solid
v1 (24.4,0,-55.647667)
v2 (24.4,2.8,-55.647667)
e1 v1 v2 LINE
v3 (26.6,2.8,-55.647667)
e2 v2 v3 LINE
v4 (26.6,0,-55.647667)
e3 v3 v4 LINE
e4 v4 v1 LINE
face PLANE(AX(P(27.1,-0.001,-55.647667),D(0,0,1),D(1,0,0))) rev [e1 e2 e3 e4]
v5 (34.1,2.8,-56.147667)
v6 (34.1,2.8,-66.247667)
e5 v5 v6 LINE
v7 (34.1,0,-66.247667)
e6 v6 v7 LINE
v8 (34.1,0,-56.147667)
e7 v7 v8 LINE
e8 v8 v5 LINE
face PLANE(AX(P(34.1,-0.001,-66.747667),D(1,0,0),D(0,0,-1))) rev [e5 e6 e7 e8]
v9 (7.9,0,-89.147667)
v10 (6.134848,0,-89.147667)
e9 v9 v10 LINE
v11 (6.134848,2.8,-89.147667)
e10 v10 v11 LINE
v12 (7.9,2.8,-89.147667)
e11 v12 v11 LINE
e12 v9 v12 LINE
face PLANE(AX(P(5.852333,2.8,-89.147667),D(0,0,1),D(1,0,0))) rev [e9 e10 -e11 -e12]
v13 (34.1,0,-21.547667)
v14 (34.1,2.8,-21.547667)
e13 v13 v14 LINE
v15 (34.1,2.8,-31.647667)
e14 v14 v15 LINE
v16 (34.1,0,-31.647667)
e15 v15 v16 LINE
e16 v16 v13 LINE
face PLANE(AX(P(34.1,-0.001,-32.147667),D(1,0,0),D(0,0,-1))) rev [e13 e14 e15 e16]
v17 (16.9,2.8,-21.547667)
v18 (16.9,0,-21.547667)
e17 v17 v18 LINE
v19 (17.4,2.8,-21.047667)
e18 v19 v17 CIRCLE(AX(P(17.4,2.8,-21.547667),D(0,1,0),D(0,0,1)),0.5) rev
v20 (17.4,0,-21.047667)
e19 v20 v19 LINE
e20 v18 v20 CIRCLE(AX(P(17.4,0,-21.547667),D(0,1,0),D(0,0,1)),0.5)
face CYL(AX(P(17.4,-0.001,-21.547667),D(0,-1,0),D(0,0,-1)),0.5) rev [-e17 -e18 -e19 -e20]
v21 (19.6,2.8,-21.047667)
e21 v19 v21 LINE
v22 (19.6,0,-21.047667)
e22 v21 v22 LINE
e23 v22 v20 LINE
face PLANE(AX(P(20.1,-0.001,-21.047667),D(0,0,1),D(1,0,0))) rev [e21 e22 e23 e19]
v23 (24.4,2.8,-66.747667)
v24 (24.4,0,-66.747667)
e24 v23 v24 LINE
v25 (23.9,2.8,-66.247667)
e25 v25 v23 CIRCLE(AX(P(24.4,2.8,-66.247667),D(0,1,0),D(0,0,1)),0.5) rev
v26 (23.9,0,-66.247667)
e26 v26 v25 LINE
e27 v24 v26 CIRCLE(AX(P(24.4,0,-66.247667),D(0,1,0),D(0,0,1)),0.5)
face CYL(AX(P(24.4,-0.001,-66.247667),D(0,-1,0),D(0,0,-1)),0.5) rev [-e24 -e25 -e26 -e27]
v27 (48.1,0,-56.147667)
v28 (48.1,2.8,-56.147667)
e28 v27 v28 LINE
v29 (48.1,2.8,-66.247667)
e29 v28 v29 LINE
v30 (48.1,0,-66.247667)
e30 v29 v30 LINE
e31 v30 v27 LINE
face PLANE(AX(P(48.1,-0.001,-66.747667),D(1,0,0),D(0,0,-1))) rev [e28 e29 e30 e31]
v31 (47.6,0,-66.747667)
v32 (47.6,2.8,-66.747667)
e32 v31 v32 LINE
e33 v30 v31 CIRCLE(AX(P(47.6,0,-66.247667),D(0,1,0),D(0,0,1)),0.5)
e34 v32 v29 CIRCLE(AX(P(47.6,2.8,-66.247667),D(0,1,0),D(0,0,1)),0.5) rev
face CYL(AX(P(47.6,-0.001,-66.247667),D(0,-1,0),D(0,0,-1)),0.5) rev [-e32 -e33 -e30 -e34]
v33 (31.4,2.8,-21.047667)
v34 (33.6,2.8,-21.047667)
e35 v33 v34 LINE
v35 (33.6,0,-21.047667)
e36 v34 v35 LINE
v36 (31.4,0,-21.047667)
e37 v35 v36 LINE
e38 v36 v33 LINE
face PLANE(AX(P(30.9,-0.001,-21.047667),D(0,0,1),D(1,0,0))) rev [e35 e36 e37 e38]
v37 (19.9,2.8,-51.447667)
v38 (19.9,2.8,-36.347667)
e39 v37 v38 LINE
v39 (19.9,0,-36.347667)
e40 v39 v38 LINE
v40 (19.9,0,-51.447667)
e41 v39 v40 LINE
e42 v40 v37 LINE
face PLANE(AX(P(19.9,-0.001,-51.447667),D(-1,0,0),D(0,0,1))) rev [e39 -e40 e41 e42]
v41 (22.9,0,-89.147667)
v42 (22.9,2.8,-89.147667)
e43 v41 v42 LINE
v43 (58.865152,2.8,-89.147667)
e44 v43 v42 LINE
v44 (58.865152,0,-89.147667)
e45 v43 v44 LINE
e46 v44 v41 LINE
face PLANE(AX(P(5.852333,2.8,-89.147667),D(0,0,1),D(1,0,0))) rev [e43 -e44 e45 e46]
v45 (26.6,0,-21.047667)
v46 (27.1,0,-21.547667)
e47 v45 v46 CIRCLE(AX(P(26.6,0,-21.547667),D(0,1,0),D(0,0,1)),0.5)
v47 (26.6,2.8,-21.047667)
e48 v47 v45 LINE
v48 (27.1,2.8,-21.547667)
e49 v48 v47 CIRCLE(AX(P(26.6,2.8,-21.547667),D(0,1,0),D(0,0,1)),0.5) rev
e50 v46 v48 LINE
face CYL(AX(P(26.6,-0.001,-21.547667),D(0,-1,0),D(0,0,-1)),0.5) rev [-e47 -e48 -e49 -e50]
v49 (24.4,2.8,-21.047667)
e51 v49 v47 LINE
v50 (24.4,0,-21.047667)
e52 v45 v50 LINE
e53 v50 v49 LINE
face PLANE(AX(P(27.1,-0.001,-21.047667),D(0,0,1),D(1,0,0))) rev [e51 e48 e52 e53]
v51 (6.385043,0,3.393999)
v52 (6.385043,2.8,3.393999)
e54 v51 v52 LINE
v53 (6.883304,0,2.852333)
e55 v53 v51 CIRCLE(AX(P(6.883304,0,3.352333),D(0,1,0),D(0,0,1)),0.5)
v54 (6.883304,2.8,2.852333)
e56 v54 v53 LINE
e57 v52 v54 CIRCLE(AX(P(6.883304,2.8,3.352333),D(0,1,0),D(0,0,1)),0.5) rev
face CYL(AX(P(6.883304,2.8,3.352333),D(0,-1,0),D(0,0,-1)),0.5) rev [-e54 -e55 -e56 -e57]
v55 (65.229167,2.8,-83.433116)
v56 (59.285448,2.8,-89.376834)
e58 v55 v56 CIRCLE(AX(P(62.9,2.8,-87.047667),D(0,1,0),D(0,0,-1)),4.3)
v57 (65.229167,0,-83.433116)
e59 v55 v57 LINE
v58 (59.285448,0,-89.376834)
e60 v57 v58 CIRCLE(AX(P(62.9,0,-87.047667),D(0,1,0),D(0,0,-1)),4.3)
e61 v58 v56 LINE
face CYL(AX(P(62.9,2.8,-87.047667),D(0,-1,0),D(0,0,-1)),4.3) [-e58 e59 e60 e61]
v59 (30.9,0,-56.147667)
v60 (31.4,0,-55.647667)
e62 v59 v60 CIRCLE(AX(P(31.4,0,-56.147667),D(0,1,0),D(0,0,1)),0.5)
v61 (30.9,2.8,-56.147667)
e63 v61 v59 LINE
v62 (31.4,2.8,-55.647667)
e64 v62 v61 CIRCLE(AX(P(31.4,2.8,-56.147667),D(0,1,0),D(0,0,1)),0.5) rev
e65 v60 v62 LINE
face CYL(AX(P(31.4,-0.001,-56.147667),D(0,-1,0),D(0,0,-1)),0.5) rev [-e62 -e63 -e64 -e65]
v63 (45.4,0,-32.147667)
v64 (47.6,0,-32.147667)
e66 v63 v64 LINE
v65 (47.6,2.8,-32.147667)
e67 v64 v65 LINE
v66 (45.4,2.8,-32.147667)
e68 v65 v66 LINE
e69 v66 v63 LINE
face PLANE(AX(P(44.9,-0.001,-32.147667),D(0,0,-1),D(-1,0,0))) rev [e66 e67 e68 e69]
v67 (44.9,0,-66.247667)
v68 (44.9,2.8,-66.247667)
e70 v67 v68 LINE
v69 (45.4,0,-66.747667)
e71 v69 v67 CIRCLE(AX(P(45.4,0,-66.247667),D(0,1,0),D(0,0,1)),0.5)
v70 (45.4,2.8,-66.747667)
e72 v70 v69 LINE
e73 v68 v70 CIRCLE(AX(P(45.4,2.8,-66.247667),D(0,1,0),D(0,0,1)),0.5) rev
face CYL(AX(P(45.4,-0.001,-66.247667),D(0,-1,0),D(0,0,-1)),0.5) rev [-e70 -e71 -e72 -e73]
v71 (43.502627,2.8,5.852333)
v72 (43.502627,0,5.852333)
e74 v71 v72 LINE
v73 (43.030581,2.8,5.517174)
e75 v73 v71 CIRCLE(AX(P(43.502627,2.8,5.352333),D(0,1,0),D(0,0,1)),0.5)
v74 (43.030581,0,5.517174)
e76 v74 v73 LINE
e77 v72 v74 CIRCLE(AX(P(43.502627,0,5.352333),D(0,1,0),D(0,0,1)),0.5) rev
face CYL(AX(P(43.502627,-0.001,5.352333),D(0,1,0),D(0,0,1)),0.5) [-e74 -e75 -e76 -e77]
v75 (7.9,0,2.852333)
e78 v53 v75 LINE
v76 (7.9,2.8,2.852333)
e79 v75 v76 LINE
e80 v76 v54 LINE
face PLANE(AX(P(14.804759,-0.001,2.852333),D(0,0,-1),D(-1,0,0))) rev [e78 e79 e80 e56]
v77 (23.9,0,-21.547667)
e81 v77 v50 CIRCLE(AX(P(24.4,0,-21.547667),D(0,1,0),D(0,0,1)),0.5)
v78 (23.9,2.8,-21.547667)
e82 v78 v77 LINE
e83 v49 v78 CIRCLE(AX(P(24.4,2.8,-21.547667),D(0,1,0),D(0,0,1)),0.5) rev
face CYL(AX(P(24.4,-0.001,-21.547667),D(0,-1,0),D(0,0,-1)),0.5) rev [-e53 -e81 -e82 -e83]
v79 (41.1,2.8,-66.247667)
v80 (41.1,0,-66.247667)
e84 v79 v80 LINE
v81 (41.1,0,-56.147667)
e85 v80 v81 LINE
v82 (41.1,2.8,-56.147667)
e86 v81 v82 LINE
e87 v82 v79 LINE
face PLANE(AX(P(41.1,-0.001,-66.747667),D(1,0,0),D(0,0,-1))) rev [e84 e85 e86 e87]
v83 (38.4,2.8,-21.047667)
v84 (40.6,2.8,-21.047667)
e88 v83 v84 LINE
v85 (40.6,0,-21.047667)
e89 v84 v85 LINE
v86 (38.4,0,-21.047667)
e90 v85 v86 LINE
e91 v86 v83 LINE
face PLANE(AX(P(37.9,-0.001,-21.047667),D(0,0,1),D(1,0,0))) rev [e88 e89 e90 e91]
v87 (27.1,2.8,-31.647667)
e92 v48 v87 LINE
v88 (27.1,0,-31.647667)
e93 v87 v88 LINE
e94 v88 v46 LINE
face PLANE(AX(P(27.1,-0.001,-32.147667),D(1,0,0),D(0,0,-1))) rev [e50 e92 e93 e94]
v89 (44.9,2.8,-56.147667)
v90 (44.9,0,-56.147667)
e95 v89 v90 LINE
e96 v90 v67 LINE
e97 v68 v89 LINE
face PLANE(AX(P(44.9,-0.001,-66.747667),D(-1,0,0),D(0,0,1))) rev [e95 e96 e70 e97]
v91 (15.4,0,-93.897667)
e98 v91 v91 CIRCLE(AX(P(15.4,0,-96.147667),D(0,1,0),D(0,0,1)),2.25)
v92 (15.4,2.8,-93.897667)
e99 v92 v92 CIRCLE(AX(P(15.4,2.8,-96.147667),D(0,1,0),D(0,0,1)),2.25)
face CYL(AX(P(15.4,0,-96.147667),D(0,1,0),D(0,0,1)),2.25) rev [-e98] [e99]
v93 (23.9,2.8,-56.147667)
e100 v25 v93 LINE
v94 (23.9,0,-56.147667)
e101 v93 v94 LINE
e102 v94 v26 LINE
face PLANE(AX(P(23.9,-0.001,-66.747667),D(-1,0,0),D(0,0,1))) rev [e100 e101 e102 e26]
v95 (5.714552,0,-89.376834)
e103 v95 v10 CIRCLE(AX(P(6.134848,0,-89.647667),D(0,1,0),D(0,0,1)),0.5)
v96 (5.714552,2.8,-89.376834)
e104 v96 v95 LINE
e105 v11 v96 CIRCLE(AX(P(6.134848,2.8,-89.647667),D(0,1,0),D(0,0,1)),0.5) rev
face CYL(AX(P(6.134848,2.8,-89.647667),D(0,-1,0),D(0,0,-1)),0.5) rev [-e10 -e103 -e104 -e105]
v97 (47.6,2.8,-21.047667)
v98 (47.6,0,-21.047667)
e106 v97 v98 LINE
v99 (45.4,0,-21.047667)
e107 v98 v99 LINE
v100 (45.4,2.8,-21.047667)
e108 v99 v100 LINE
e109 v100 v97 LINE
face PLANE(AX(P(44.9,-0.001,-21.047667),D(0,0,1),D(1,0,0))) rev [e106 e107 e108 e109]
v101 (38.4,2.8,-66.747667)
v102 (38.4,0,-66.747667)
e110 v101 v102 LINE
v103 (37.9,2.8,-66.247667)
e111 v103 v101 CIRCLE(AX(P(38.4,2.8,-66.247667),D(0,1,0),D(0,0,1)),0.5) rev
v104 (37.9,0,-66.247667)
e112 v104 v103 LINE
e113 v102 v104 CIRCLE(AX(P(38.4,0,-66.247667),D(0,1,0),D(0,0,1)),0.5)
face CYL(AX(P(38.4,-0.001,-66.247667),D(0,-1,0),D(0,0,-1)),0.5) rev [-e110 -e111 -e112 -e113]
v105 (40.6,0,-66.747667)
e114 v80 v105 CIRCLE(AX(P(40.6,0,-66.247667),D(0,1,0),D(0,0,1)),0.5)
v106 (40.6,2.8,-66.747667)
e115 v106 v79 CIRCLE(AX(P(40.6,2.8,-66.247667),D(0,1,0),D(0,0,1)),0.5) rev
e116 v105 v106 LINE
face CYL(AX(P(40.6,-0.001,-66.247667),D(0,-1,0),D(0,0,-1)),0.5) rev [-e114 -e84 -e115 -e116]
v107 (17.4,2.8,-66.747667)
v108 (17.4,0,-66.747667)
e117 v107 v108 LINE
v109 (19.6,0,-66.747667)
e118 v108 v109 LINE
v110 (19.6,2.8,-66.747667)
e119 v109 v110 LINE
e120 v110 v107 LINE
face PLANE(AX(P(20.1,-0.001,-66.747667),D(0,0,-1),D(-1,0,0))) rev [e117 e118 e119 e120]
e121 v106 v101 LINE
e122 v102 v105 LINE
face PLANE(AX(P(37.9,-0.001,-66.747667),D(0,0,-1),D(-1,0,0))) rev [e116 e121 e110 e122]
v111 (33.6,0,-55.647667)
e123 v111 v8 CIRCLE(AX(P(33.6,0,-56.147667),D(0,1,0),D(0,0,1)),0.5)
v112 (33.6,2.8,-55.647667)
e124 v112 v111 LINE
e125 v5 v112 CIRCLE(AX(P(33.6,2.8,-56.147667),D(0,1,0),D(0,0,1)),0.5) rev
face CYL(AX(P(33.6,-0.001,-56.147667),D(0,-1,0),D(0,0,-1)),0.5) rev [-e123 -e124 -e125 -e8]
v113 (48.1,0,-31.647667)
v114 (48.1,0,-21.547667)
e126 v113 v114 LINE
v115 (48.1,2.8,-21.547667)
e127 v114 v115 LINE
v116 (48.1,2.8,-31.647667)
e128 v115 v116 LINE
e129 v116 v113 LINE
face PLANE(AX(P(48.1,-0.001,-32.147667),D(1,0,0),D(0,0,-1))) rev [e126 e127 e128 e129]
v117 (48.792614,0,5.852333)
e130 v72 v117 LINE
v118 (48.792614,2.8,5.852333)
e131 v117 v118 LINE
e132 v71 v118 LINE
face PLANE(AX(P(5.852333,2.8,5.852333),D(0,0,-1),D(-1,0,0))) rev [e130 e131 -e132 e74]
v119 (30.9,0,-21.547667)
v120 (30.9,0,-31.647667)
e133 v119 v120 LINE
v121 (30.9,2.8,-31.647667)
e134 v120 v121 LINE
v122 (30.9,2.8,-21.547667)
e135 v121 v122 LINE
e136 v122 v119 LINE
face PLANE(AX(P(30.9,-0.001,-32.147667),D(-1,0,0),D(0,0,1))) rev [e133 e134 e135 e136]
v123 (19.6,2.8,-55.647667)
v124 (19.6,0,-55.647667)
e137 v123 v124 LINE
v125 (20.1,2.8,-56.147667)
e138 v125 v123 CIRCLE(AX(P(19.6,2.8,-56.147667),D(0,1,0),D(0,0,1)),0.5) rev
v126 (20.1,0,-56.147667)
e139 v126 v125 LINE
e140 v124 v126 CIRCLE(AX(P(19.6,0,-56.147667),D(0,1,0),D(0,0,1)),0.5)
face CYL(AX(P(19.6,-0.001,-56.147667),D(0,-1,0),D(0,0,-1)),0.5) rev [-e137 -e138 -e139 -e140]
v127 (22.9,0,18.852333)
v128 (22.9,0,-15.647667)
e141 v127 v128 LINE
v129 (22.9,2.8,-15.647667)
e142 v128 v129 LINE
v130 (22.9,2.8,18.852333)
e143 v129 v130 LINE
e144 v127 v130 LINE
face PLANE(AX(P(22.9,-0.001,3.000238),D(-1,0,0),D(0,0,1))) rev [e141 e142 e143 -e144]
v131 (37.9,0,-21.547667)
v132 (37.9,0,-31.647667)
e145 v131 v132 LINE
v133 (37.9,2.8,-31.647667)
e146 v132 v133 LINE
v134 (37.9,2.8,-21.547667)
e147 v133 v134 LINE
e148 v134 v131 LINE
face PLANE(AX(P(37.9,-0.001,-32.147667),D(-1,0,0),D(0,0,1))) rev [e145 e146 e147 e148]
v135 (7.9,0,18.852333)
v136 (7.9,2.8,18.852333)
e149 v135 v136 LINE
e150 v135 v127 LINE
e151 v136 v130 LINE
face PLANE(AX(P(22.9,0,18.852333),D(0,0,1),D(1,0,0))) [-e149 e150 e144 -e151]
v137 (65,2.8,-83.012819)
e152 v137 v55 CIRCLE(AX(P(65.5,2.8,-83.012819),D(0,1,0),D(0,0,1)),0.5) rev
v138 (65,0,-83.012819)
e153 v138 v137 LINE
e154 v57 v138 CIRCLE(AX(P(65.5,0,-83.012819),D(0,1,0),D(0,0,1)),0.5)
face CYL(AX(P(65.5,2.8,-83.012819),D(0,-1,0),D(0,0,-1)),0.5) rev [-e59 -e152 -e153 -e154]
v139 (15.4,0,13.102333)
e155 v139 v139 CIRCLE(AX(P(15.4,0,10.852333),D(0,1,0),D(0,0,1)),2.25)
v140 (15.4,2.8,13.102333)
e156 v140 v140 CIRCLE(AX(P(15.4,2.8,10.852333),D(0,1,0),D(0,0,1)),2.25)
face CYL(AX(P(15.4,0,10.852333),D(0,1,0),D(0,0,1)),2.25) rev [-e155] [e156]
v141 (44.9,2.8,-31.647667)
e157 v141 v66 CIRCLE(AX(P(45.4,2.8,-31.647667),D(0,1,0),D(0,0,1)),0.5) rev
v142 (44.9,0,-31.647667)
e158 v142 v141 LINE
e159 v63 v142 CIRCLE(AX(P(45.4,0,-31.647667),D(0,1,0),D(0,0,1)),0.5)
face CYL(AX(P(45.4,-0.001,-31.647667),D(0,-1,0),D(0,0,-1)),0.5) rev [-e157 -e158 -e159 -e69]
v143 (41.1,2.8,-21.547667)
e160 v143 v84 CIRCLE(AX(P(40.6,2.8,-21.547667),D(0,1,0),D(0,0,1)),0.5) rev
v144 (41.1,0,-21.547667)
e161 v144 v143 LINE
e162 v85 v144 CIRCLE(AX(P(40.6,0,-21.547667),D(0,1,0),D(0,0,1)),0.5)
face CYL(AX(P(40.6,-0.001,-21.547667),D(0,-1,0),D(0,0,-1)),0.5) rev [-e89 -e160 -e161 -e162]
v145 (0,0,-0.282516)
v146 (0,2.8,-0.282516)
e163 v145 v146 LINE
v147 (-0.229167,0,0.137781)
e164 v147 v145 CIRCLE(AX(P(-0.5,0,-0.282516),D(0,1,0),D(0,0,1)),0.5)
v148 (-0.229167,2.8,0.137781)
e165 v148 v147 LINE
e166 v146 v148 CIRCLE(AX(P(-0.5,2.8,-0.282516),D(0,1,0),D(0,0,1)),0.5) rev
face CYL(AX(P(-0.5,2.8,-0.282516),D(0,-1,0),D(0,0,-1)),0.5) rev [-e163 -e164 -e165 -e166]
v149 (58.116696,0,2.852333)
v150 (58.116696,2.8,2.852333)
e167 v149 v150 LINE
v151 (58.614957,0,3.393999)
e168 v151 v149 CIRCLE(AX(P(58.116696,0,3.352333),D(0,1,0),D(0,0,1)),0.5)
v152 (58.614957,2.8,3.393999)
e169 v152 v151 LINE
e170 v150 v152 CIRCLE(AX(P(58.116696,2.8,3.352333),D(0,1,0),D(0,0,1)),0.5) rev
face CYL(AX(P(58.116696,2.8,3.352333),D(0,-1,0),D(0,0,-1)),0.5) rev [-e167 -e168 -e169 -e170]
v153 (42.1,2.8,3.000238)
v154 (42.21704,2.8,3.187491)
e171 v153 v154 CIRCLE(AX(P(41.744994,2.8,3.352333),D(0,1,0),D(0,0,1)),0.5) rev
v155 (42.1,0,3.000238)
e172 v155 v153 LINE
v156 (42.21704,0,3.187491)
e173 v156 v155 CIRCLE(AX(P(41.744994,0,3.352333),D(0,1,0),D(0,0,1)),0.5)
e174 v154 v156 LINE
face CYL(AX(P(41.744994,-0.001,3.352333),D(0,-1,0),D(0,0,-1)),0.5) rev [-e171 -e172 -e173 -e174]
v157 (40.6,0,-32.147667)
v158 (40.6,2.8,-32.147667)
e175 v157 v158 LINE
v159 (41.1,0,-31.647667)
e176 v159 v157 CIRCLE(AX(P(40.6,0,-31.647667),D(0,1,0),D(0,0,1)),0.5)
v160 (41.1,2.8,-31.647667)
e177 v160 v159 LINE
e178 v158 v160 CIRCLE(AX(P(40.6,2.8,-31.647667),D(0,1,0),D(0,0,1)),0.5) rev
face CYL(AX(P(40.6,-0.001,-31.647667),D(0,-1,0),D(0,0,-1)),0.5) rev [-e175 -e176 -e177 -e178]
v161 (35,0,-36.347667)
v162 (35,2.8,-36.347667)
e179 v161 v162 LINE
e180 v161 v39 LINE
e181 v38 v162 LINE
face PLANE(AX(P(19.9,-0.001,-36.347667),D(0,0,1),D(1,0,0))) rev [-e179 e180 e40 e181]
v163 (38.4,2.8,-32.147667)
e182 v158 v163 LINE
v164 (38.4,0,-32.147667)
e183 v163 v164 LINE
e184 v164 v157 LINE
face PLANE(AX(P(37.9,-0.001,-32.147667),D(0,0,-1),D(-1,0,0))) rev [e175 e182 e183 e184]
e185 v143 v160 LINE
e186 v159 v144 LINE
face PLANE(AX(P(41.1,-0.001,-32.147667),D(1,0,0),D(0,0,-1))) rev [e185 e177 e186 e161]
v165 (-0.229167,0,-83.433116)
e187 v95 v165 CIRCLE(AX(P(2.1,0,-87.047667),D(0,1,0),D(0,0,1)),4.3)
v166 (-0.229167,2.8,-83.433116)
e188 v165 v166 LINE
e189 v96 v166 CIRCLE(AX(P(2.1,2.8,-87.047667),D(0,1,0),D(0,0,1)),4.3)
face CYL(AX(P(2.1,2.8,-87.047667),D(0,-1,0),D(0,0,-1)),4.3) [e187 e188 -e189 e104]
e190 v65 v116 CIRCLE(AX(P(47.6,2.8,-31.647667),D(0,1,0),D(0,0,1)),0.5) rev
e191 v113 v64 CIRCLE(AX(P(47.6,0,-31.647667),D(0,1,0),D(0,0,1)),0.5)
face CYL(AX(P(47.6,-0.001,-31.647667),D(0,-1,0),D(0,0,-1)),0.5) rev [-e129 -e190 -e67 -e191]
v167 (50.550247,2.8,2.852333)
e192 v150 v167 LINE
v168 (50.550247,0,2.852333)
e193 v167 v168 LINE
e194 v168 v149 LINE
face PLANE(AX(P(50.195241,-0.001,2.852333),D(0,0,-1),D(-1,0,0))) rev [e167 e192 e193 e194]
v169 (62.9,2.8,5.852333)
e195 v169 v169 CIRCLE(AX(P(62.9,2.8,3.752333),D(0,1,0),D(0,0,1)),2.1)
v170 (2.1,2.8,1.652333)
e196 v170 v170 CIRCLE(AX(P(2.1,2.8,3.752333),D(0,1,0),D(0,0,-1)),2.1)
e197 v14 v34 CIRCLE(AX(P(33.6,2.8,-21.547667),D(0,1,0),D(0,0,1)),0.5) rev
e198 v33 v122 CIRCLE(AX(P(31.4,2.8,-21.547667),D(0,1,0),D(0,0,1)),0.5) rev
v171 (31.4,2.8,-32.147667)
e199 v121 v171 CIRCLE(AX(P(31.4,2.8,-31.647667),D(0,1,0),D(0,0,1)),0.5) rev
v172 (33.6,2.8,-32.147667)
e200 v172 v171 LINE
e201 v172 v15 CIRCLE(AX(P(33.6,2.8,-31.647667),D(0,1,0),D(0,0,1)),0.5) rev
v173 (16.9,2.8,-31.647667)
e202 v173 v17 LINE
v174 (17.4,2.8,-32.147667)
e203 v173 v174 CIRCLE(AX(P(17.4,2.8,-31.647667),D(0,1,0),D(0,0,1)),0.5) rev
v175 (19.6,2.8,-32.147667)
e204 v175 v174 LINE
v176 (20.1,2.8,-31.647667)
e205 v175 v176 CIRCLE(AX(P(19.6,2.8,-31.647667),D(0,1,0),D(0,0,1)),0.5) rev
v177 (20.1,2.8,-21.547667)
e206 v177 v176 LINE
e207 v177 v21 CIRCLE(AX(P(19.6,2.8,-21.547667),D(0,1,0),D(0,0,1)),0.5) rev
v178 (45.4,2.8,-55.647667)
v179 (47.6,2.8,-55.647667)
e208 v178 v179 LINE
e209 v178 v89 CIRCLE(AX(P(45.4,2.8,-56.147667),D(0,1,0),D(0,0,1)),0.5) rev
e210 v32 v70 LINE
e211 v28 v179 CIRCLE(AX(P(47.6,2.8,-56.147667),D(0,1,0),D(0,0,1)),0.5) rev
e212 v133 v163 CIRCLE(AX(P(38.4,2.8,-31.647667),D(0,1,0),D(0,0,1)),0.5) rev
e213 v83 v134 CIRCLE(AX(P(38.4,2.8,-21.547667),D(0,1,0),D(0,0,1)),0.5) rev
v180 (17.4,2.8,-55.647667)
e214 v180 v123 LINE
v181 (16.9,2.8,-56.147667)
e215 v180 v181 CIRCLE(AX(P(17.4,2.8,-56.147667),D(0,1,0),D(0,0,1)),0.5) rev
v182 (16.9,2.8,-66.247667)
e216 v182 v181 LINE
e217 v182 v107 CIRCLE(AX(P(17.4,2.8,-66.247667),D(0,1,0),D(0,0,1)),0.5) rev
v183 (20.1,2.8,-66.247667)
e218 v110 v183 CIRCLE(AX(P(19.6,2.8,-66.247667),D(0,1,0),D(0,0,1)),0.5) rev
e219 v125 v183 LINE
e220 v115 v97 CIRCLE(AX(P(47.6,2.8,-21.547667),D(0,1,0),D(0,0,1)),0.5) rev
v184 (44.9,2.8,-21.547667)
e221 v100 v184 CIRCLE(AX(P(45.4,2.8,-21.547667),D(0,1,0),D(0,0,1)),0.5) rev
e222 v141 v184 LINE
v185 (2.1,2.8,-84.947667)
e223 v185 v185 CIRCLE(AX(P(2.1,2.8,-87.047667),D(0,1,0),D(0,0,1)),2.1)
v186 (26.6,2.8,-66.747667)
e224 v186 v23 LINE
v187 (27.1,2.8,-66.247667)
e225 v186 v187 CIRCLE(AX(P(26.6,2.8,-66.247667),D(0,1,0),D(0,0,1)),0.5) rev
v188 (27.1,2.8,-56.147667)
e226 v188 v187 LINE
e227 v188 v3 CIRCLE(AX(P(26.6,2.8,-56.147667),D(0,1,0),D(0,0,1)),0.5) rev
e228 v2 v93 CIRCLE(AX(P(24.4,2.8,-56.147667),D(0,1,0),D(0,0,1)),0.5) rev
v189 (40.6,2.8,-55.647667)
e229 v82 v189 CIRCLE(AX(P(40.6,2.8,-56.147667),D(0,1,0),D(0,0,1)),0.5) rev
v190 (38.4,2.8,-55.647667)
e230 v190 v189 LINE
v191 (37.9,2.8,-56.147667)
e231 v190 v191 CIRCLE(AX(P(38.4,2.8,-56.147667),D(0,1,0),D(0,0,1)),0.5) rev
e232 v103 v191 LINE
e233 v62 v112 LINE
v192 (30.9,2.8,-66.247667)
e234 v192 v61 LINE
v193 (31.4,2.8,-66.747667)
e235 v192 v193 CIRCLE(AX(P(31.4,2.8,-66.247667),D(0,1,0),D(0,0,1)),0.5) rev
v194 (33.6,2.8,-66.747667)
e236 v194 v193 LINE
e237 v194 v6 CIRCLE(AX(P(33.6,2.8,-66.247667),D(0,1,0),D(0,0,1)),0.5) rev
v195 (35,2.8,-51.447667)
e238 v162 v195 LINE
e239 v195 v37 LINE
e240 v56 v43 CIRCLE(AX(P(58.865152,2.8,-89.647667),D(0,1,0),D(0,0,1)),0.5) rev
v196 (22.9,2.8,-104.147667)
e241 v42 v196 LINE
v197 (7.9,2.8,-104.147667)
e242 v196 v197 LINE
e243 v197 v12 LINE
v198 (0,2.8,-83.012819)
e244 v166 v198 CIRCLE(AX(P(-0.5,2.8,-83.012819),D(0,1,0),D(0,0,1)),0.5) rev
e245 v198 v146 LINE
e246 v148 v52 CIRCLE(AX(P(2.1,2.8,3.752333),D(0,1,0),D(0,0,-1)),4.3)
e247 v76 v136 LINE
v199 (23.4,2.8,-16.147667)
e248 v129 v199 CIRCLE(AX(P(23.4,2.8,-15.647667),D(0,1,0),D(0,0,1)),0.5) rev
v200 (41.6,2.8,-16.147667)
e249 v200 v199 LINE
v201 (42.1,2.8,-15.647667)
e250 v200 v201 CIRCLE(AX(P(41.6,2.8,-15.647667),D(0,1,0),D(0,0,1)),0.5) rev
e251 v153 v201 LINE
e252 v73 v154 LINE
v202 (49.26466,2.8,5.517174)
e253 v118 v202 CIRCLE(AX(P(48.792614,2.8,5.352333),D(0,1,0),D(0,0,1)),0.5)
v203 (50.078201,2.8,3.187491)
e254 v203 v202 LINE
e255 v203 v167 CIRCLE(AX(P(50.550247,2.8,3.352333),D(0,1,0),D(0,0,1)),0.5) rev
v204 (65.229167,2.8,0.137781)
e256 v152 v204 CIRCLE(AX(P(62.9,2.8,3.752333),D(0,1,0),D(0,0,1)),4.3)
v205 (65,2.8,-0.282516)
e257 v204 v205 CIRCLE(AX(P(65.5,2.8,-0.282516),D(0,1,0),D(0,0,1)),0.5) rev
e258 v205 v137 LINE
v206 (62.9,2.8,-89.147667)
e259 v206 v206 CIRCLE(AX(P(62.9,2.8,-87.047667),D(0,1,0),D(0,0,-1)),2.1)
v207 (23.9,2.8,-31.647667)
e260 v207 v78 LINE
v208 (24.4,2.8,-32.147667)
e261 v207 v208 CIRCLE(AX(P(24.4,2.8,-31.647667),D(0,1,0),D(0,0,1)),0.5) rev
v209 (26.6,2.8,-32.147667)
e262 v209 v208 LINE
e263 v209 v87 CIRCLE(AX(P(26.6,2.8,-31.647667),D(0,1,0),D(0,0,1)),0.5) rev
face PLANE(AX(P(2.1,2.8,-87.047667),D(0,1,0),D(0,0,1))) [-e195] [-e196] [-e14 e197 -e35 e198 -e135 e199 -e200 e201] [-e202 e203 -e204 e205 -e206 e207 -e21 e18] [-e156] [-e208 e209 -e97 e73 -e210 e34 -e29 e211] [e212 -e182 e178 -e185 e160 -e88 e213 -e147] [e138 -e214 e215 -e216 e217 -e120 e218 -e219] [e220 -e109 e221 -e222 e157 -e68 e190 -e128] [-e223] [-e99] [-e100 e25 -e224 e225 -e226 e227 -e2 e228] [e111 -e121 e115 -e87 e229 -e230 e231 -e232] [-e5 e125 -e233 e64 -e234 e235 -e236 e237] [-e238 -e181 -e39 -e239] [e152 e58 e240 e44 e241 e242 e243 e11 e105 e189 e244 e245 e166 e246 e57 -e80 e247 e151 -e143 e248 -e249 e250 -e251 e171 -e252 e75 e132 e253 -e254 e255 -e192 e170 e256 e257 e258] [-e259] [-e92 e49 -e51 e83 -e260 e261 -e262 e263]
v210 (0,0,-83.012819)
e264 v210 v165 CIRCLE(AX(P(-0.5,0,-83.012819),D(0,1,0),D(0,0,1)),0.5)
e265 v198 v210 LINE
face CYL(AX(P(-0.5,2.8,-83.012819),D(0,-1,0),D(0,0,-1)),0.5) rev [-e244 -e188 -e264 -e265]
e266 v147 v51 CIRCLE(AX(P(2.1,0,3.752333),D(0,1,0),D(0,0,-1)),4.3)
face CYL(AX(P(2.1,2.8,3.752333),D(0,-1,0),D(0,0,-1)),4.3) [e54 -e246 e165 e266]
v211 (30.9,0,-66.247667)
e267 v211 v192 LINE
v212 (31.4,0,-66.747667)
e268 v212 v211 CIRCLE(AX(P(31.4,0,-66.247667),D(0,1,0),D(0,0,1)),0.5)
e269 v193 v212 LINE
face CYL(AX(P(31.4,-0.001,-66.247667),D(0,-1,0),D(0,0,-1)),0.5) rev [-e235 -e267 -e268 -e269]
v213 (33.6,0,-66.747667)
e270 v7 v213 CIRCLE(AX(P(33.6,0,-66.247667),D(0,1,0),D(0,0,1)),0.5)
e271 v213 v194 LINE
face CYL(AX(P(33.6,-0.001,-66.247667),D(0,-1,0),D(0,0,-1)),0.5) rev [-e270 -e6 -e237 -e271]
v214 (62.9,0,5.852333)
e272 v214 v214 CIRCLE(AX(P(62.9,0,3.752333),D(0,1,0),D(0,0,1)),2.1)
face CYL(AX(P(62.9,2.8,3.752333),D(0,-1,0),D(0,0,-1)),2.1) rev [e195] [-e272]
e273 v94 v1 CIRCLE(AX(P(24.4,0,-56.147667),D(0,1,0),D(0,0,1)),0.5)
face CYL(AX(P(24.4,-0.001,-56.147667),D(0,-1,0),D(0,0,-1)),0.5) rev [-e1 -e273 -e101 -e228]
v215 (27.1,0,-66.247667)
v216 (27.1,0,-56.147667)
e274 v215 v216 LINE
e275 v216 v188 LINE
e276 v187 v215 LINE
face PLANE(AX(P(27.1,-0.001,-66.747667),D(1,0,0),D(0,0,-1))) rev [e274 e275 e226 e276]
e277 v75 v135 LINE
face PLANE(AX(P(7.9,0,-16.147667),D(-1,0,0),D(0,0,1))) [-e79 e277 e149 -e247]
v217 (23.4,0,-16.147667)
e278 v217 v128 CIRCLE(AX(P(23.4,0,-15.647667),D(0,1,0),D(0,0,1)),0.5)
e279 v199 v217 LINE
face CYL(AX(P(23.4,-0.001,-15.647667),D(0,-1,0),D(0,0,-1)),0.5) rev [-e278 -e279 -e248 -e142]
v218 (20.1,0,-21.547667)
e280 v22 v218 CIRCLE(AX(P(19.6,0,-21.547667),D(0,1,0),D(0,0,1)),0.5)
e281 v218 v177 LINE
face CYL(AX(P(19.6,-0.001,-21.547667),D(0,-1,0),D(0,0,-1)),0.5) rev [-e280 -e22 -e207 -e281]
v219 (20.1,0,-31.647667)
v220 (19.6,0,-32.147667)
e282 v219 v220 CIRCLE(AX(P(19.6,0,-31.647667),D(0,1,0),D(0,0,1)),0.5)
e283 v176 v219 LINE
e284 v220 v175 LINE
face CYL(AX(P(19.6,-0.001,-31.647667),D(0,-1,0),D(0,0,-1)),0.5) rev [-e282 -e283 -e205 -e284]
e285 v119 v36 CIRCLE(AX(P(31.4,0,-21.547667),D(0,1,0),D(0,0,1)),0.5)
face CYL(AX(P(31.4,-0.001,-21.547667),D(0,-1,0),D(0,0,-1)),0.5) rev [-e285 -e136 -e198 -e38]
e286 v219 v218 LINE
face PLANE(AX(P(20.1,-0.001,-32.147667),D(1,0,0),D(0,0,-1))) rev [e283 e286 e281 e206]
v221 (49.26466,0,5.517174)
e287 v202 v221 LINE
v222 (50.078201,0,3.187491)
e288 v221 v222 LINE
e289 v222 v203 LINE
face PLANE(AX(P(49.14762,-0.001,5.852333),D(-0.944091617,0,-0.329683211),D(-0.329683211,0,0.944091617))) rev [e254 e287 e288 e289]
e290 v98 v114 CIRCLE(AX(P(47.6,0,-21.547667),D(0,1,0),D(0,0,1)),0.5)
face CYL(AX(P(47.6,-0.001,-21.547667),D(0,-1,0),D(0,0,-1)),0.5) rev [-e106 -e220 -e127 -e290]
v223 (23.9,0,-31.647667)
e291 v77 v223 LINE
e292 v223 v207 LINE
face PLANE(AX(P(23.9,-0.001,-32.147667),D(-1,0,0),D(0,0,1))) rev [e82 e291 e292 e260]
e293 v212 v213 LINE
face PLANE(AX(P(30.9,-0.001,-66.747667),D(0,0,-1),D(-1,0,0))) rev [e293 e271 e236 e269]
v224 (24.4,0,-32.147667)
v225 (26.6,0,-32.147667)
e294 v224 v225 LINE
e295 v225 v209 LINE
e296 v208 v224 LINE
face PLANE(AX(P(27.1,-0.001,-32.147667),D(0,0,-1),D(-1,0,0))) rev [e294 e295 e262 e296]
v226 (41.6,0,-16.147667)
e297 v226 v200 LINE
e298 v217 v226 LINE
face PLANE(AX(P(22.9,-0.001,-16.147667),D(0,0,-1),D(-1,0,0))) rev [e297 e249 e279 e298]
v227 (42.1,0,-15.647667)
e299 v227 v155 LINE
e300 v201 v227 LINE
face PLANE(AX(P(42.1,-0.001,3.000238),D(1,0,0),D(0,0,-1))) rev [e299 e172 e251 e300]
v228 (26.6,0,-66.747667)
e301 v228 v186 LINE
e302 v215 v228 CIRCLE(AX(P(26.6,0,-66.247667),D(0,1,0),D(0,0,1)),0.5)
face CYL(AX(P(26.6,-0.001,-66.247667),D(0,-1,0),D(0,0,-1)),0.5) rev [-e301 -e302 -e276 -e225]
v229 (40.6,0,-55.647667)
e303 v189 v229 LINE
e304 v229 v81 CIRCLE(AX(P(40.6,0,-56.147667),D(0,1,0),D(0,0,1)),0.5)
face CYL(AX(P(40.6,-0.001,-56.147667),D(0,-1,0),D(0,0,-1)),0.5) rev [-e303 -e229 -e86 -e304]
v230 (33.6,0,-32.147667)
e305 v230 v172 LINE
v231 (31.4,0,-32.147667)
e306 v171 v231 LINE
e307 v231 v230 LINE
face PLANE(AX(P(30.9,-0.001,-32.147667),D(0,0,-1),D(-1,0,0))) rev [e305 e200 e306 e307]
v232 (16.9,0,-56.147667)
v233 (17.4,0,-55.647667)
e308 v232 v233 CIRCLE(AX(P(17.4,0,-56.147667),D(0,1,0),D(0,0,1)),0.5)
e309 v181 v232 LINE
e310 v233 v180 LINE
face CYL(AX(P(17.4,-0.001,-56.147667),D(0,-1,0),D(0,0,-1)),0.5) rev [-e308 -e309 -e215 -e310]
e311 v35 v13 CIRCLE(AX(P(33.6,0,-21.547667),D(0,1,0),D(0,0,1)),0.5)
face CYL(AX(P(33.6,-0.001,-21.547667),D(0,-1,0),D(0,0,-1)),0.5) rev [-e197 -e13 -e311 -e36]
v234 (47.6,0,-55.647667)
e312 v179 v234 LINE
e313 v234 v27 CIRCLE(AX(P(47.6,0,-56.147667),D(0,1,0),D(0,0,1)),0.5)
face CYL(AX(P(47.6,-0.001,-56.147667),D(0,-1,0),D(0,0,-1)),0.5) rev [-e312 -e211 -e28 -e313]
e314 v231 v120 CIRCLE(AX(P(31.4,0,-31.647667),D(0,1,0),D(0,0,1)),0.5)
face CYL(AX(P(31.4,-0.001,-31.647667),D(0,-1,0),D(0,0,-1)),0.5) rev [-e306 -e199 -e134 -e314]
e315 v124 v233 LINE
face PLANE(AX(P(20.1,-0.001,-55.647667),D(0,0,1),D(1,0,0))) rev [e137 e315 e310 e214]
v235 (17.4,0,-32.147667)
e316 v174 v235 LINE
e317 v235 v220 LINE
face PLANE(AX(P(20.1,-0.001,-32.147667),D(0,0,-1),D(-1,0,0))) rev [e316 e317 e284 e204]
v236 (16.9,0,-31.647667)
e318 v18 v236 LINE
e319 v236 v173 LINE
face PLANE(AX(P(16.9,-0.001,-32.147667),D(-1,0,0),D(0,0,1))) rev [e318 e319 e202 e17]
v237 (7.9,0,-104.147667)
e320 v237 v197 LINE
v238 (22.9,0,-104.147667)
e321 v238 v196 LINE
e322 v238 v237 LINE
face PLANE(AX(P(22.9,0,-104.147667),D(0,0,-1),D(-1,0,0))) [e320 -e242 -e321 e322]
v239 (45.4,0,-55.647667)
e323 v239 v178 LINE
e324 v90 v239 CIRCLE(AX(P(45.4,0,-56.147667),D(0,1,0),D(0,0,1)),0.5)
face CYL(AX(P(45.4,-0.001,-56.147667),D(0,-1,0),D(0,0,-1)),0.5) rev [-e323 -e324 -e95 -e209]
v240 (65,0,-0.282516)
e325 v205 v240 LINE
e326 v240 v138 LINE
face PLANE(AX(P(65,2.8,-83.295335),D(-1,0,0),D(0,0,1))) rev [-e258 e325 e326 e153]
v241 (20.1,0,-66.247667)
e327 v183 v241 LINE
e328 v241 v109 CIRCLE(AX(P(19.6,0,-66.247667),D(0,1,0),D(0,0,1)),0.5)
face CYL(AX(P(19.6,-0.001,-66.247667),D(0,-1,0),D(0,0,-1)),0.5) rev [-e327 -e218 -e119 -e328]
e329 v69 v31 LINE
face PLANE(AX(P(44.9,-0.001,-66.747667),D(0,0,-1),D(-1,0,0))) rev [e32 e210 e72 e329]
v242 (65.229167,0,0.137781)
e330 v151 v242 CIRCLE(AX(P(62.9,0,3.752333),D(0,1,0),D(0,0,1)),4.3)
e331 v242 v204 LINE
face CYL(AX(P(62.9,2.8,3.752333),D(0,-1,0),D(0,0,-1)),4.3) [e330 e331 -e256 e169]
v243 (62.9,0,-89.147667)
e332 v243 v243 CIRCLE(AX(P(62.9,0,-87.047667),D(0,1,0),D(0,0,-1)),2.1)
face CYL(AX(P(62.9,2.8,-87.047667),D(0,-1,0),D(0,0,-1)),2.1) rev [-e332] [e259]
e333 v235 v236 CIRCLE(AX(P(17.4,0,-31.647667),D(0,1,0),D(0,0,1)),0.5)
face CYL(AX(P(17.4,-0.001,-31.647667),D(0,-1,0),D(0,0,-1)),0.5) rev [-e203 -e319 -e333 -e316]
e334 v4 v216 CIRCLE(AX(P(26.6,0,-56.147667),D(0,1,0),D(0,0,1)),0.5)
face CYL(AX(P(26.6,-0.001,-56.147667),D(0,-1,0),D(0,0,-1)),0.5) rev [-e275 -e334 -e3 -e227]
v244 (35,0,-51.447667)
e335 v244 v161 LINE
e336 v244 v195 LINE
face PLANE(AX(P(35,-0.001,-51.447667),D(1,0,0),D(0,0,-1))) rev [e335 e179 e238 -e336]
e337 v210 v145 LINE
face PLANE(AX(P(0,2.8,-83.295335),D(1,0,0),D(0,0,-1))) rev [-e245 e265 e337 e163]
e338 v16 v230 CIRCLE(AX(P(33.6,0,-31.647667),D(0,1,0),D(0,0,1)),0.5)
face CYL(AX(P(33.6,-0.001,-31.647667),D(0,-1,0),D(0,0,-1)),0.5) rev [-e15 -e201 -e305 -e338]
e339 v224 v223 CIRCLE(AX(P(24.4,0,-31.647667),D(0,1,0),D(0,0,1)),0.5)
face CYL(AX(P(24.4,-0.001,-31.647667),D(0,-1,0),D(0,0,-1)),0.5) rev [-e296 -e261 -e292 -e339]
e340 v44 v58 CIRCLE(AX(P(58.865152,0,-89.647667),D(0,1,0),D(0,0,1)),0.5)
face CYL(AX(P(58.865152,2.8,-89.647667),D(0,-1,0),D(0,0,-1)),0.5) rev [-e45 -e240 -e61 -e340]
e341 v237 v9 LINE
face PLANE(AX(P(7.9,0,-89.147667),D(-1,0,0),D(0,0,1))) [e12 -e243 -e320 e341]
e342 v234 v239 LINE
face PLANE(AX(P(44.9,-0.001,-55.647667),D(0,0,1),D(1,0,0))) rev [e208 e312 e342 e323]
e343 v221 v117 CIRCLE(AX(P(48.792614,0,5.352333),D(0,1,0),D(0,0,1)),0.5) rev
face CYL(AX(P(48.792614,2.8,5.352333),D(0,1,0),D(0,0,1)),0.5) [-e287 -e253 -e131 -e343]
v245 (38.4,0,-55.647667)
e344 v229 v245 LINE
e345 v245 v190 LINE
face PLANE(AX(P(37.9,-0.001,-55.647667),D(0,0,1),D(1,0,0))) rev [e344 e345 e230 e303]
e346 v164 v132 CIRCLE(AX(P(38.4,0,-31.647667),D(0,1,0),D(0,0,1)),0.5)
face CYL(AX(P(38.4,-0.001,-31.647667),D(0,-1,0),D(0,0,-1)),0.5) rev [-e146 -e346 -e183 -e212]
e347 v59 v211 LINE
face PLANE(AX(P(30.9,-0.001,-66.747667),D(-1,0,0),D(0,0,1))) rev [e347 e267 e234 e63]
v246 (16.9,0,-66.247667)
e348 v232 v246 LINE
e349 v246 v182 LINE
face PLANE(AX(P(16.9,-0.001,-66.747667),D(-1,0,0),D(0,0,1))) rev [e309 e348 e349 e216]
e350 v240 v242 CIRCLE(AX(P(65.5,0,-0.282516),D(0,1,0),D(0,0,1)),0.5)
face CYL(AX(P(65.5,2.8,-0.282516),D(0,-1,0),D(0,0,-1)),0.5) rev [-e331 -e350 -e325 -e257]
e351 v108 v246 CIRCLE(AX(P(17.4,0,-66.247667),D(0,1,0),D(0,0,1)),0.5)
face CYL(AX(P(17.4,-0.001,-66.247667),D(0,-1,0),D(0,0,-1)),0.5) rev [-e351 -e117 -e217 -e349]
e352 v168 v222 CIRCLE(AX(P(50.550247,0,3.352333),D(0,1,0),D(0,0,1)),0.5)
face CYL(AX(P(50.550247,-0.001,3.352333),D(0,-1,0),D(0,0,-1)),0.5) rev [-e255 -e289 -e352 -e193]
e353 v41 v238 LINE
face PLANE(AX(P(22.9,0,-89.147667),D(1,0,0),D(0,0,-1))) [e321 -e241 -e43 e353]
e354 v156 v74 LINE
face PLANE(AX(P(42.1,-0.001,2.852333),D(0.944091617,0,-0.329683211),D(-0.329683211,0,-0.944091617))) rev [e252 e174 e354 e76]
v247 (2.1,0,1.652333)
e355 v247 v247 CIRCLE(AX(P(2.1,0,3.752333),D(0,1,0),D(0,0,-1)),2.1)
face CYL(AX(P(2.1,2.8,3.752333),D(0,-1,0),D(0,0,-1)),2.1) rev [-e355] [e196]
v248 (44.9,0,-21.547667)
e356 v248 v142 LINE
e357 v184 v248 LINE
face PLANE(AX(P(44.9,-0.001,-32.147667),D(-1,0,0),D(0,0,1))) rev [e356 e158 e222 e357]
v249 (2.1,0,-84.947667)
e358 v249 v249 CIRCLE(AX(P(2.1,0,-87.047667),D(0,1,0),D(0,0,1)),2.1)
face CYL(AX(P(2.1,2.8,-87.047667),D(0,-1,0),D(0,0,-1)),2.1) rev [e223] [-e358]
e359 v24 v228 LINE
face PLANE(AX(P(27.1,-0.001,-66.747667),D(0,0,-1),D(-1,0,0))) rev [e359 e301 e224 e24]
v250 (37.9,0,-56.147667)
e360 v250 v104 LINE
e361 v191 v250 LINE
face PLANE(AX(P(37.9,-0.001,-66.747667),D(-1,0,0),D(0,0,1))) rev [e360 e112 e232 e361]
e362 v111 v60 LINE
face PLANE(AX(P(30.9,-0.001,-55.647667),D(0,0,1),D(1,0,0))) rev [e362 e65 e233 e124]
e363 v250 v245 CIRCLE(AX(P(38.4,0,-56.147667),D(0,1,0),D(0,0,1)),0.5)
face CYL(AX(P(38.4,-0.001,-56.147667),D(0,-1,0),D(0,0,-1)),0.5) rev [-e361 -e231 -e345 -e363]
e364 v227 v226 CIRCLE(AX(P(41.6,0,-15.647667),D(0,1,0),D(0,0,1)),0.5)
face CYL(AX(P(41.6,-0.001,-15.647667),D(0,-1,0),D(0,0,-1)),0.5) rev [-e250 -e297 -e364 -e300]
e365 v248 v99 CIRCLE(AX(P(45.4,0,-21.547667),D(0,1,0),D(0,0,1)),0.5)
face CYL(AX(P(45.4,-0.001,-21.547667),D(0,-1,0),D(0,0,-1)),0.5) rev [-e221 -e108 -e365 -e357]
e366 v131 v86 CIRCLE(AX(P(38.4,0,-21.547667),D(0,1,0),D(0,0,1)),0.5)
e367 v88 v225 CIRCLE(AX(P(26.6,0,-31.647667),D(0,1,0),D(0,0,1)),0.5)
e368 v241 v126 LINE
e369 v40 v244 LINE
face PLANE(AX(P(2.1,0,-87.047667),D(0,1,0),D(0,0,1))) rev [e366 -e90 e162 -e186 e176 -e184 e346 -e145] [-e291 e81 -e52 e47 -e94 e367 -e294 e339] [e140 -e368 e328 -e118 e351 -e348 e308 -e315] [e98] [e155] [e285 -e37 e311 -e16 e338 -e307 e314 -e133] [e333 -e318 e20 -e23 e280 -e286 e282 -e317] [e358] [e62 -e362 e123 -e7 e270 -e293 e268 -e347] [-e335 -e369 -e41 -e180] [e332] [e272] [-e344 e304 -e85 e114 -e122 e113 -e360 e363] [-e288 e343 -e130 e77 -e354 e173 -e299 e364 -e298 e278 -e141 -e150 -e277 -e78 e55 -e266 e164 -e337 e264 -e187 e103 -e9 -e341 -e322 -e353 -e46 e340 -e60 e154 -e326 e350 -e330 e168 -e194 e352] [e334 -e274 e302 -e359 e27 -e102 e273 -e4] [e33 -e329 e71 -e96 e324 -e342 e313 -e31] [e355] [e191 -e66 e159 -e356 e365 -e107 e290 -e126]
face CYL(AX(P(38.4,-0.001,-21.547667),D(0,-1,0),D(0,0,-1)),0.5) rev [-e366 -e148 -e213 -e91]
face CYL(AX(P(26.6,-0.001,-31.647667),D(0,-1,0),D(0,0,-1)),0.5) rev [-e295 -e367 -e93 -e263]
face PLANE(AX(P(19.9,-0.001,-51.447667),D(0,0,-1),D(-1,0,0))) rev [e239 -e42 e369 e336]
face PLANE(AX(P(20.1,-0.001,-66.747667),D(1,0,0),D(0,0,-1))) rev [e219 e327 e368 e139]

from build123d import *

# Parameters (mm, degrees)
BASEPLATE_OUTLINE_R = 2.1
BASEPLATE_DEPTH     = 2.8
CUT_EXTRUDE1_REACH  = 115.438
SKETCH3_W           = 19.2
SKETCH3_H           = 19.147905432
SKETCH3_W_2         = 15.1
SKETCH3_H_2         = 15.1
SKETCH3_W_3         = 3.2
SKETCH3_H_3         = 11.1
FILLET1_R           = 0.5
SKETCH4_W           = 15
SKETCH4_H           = 35
SKETCH4_R           = 2.25
SKETCH4_H_2         = 15
BOSS_EXTRUDE1_DEPTH = 2.8


# Read off the part's stored shape, not the designer's step: BasePlate
with BuildPart() as part:
    # BasePlate outline → BasePlate (new body)
    with BuildSketch(Plane(origin=(0, 0, 0), x_dir=(1, 0, 0), z_dir=(0, 1, 0))):
        with BuildLine():
            Line((43.502626614, -5.852332608), (48.792614178, -5.852332608))
            ThreePointArc((48.792614178, -5.852332608), (49.082078508, -5.760021707), (49.264659986, -5.517174213))
            Line((49.264659986, -5.517174213), (50.078201202, -3.187491002))
            ThreePointArc((50.078201202, -3.187491002), (50.26078268, -2.944643509), (50.55024701, -2.852332608))
            Line((50.55024701, -2.852332608), (58.116695703, -2.852332608))
            ThreePointArc((58.116695703, -2.852332608), (58.484685739, -3.013831008), (58.614956567, -3.393999275))
            ThreePointArc((58.614956567, -3.393999275), (64.799237397, -7.61016844), (65.229166667, -0.137781095))
            ThreePointArc((65.229166667, -0.137781095), (65.061014427, 0.043158816), (65, 0.282515593))
            Line((65, 0.282515593), (65, 83.012819192))
            ThreePointArc((65, 83.012819192), (65.061014427, 83.252175969), (65.229166667, 83.433115879))
            ThreePointArc((65.229166667, 83.433115879), (65.940559159, 90.088226551), (59.285448487, 89.376834059))
            ThreePointArc((59.285448487, 89.376834059), (59.104508577, 89.208681819), (58.8651518, 89.147667392))
            Line((58.8651518, 89.147667392), (6.1348482, 89.147667392))
            ThreePointArc((6.1348482, 89.147667392), (5.895491423, 89.208681819), (5.714551513, 89.376834059))
            ThreePointArc((5.714551513, 89.376834059), (-0.940559159, 90.088226551), (-0.229166667, 83.433115879))
            ThreePointArc((-0.229166667, 83.433115879), (-0.061014427, 83.252175969), (0, 83.012819192))
            Line((0, 83.012819192), (0, 0.282515593))
            ThreePointArc((0, 0.282515593), (-0.061014427, 0.043158816), (-0.229166667, -0.137781095))
            ThreePointArc((-0.229166667, -0.137781095), (0.200762603, -7.61016844), (6.385043433, -3.393999275))
            ThreePointArc((6.385043433, -3.393999275), (6.515314261, -3.013831008), (6.883304297, -2.852332608))
            Line((6.883304297, -2.852332608), (14.44975299, -2.852332608))
            ThreePointArc((14.44975299, -2.852332608), (14.73921732, -2.944643509), (14.921798798, -3.187491002))
            Line((14.921798798, -3.187491002), (15.735340014, -5.517174213))
            ThreePointArc((15.735340014, -5.517174213), (15.917921492, -5.760021707), (16.207385822, -5.852332608))
            Line((16.207385822, -5.852332608), (21.497373386, -5.852332608))
            ThreePointArc((21.497373386, -5.852332608), (21.786837716, -5.760021707), (21.969419194, -5.517174213))
            Line((21.969419194, -5.517174213), (22.78296041, -3.187491002))
            ThreePointArc((22.78296041, -3.187491002), (22.965541888, -2.944643509), (23.255006218, -2.852332608))
            Line((23.255006218, -2.852332608), (41.744993782, -2.852332608))
            ThreePointArc((41.744993782, -2.852332608), (42.034458112, -2.944643509), (42.21703959, -3.187491002))
            Line((42.21703959, -3.187491002), (43.030580806, -5.517174213))
            ThreePointArc((43.030580806, -5.517174213), (43.213162284, -5.760021707), (43.502626614, -5.852332608))
        make_face()
        with Locations((2.1, -3.752332608)):
            Circle(BASEPLATE_OUTLINE_R, mode=Mode.SUBTRACT)
        with Locations((62.9, -3.752332608)):
            Circle(BASEPLATE_OUTLINE_R, mode=Mode.SUBTRACT)
        with Locations((2.1, 87.047667392)):
            Circle(BASEPLATE_OUTLINE_R, mode=Mode.SUBTRACT)
        with Locations((62.9, 87.047667392)):
            Circle(BASEPLATE_OUTLINE_R, mode=Mode.SUBTRACT)
    extrude(amount=BASEPLATE_DEPTH)

    # Sketch3 → Cut-Extrude1 (cut, up to next)
    with BuildSketch(Plane(origin=(0, 2.8, 0), x_dir=(1, 0, 0), z_dir=(0, 1, 0)), mode=Mode.PRIVATE) as cut_extrude1_sk1:
        with Locations((32.5, 6.573714676)):
            Rectangle(SKETCH3_W, SKETCH3_H)
    cut_extrude1_tool1 = extrude(cut_extrude1_sk1.sketch, amount=-CUT_EXTRUDE1_REACH, mode=Mode.PRIVATE) & part.part
    # Sketch3 → Cut-Extrude1 (cut, up to next)
    with BuildSketch(Plane(origin=(0, 2.8, 0), x_dir=(1, 0, 0), z_dir=(0, 1, 0)), mode=Mode.PRIVATE) as cut_extrude1_sk2:
        with Locations((27.45, 43.897667392)):
            Rectangle(SKETCH3_W_2, SKETCH3_H_2)
    cut_extrude1_tool2 = extrude(cut_extrude1_sk2.sketch, amount=-CUT_EXTRUDE1_REACH, mode=Mode.PRIVATE) & part.part
    # Sketch3 → Cut-Extrude1 (cut, up to next)
    with BuildSketch(Plane(origin=(0, 2.8, 0), x_dir=(1, 0, 0), z_dir=(0, 1, 0)), mode=Mode.PRIVATE) as cut_extrude1_sk3:
        with Locations((32.5, 26.597667392)):
            Rectangle(SKETCH3_W_3, SKETCH3_H_3)
    cut_extrude1_tool3 = extrude(cut_extrude1_sk3.sketch, amount=-CUT_EXTRUDE1_REACH, mode=Mode.PRIVATE) & part.part
    # Sketch3 → Cut-Extrude1 (cut, up to next)
    with BuildSketch(Plane(origin=(0, 2.8, 0), x_dir=(1, 0, 0), z_dir=(0, 1, 0)), mode=Mode.PRIVATE) as cut_extrude1_sk4:
        with Locations((18.5, 26.597667392)):
            Rectangle(SKETCH3_W_3, SKETCH3_H_3)
    cut_extrude1_tool4 = extrude(cut_extrude1_sk4.sketch, amount=-CUT_EXTRUDE1_REACH, mode=Mode.PRIVATE) & part.part
    # Sketch3 → Cut-Extrude1 (cut, up to next)
    with BuildSketch(Plane(origin=(0, 2.8, 0), x_dir=(1, 0, 0), z_dir=(0, 1, 0)), mode=Mode.PRIVATE) as cut_extrude1_sk5:
        with Locations((39.5, 26.597667392)):
            Rectangle(SKETCH3_W_3, SKETCH3_H_3)
    cut_extrude1_tool5 = extrude(cut_extrude1_sk5.sketch, amount=-CUT_EXTRUDE1_REACH, mode=Mode.PRIVATE) & part.part
    # Sketch3 → Cut-Extrude1 (cut, up to next)
    with BuildSketch(Plane(origin=(0, 2.8, 0), x_dir=(1, 0, 0), z_dir=(0, 1, 0)), mode=Mode.PRIVATE) as cut_extrude1_sk6:
        with Locations((46.5, 26.597667392)):
            Rectangle(SKETCH3_W_3, SKETCH3_H_3)
    cut_extrude1_tool6 = extrude(cut_extrude1_sk6.sketch, amount=-CUT_EXTRUDE1_REACH, mode=Mode.PRIVATE) & part.part
    # Sketch3 → Cut-Extrude1 (cut, up to next)
    with BuildSketch(Plane(origin=(0, 2.8, 0), x_dir=(1, 0, 0), z_dir=(0, 1, 0)), mode=Mode.PRIVATE) as cut_extrude1_sk7:
        with Locations((25.5, 26.597667392)):
            Rectangle(SKETCH3_W_3, SKETCH3_H_3)
    cut_extrude1_tool7 = extrude(cut_extrude1_sk7.sketch, amount=-CUT_EXTRUDE1_REACH, mode=Mode.PRIVATE) & part.part
    # Sketch3 → Cut-Extrude1 (cut, up to next)
    with BuildSketch(Plane(origin=(0, 2.8, 0), x_dir=(1, 0, 0), z_dir=(0, 1, 0)), mode=Mode.PRIVATE) as cut_extrude1_sk8:
        with Locations((18.5, 61.197667392)):
            Rectangle(SKETCH3_W_3, SKETCH3_H_3)
    cut_extrude1_tool8 = extrude(cut_extrude1_sk8.sketch, amount=-CUT_EXTRUDE1_REACH, mode=Mode.PRIVATE) & part.part
    # Sketch3 → Cut-Extrude1 (cut, up to next)
    with BuildSketch(Plane(origin=(0, 2.8, 0), x_dir=(1, 0, 0), z_dir=(0, 1, 0)), mode=Mode.PRIVATE) as cut_extrude1_sk9:
        with Locations((32.5, 61.197667392)):
            Rectangle(SKETCH3_W_3, SKETCH3_H_3)
    cut_extrude1_tool9 = extrude(cut_extrude1_sk9.sketch, amount=-CUT_EXTRUDE1_REACH, mode=Mode.PRIVATE) & part.part
    # Sketch3 → Cut-Extrude1 (cut, up to next)
    with BuildSketch(Plane(origin=(0, 2.8, 0), x_dir=(1, 0, 0), z_dir=(0, 1, 0)), mode=Mode.PRIVATE) as cut_extrude1_sk10:
        with Locations((39.5, 61.197667392)):
            Rectangle(SKETCH3_W_3, SKETCH3_H_3)
    cut_extrude1_tool10 = extrude(cut_extrude1_sk10.sketch, amount=-CUT_EXTRUDE1_REACH, mode=Mode.PRIVATE) & part.part
    # Sketch3 → Cut-Extrude1 (cut, up to next)
    with BuildSketch(Plane(origin=(0, 2.8, 0), x_dir=(1, 0, 0), z_dir=(0, 1, 0)), mode=Mode.PRIVATE) as cut_extrude1_sk11:
        with Locations((46.5, 61.197667392)):
            Rectangle(SKETCH3_W_3, SKETCH3_H_3)
    cut_extrude1_tool11 = extrude(cut_extrude1_sk11.sketch, amount=-CUT_EXTRUDE1_REACH, mode=Mode.PRIVATE) & part.part
    # Sketch3 → Cut-Extrude1 (cut, up to next)
    with BuildSketch(Plane(origin=(0, 2.8, 0), x_dir=(1, 0, 0), z_dir=(0, 1, 0)), mode=Mode.PRIVATE) as cut_extrude1_sk12:
        with Locations((25.5, 61.197667392)):
            Rectangle(SKETCH3_W_3, SKETCH3_H_3)
    cut_extrude1_tool12 = extrude(cut_extrude1_sk12.sketch, amount=-CUT_EXTRUDE1_REACH, mode=Mode.PRIVATE) & part.part
    add(cut_extrude1_tool1.solids().sort_by_distance((32.5, 2.8, -6.573715))[0], mode=Mode.SUBTRACT)
    add(cut_extrude1_tool2.solids().sort_by_distance((27.45, 2.8, -43.897667))[0], mode=Mode.SUBTRACT)
    add(cut_extrude1_tool3.solids().sort_by_distance((32.5, 2.8, -26.597667))[0], mode=Mode.SUBTRACT)
    add(cut_extrude1_tool4.solids().sort_by_distance((18.5, 2.8, -26.597667))[0], mode=Mode.SUBTRACT)
    add(cut_extrude1_tool5.solids().sort_by_distance((39.5, 2.8, -26.597667))[0], mode=Mode.SUBTRACT)
    add(cut_extrude1_tool6.solids().sort_by_distance((46.5, 2.8, -26.597667))[0], mode=Mode.SUBTRACT)
    add(cut_extrude1_tool7.solids().sort_by_distance((25.5, 2.8, -26.597667))[0], mode=Mode.SUBTRACT)
    add(cut_extrude1_tool8.solids().sort_by_distance((18.5, 2.8, -61.197667))[0], mode=Mode.SUBTRACT)
    add(cut_extrude1_tool9.solids().sort_by_distance((32.5, 2.8, -61.197667))[0], mode=Mode.SUBTRACT)
    add(cut_extrude1_tool10.solids().sort_by_distance((39.5, 2.8, -61.197667))[0], mode=Mode.SUBTRACT)
    add(cut_extrude1_tool11.solids().sort_by_distance((46.5, 2.8, -61.197667))[0], mode=Mode.SUBTRACT)
    add(cut_extrude1_tool12.solids().sort_by_distance((25.5, 2.8, -61.197667))[0], mode=Mode.SUBTRACT)

    # Fillet1
    fillet1_edges = [part.edges().sort_by_distance(p)[0] for p in [
        (22.9, 1.4, -16.147667392),
        (42.1, 1.4, -16.147667392),
        (37.9, 1.4, -55.647667392),
        (37.9, 1.4, -66.747667392),
        (41.1, 1.4, -66.747667392),
        (41.1, 1.4, -55.647667392),
        (16.9, 1.4, -66.747667392),
        (20.1, 1.4, -66.747667392),
        (20.1, 1.4, -55.647667392),
        (16.9, 1.4, -55.647667392),
        (27.1, 1.4, -66.747667392),
        (27.1, 1.4, -55.647667392),
        (23.9, 1.4, -55.647667392),
        (23.9, 1.4, -66.747667392),
        (30.9, 1.4, -21.047667392),
        (30.9, 1.4, -32.147667392),
        (34.1, 1.4, -32.147667392),
        (34.1, 1.4, -21.047667392),
        (44.9, 1.4, -21.047667392),
        (44.9, 1.4, -32.147667392),
        (48.1, 1.4, -32.147667392),
        (48.1, 1.4, -21.047667392),
        (37.9, 1.4, -21.047667392),
        (37.9, 1.4, -32.147667392),
        (41.1, 1.4, -32.147667392),
        (41.1, 1.4, -21.047667392),
        (16.9, 1.4, -32.147667392),
        (20.1, 1.4, -32.147667392),
        (20.1, 1.4, -21.047667392),
        (16.9, 1.4, -21.047667392),
        (27.1, 1.4, -32.147667392),
        (27.1, 1.4, -21.047667392),
        (23.9, 1.4, -21.047667392),
        (23.9, 1.4, -32.147667392),
        (30.9, 1.4, -55.647667392),
        (30.9, 1.4, -66.747667392),
        (34.1, 1.4, -66.747667392),
        (34.1, 1.4, -55.647667392),
        (44.9, 1.4, -55.647667392),
        (44.9, 1.4, -66.747667392),
        (48.1, 1.4, -66.747667392),
        (48.1, 1.4, -55.647667392),
    ]]
    fillet(fillet1_edges, radius=FILLET1_R)

    # Sketch4 → Boss-Extrude1 (add)
    # profile 1 of 2: a face of its own
    with BuildSketch(Plane(origin=(0, 2.8, 0), x_dir=(1, 0, 0), z_dir=(0, 1, 0))):
        with Locations((15.4, -1.352332608)):
            Rectangle(SKETCH4_W, SKETCH4_H)
        with Locations(Location((15.4, -10.852332608, 0), (0, 0, 270))):
            Circle(SKETCH4_R, mode=Mode.SUBTRACT)
    # profile 2 of 2: a face of its own
    with BuildSketch(Plane(origin=(0, 2.8, 0), x_dir=(1, 0, 0), z_dir=(0, 1, 0))):
        with Locations((15.4, 96.647667392)):
            Rectangle(SKETCH4_W, SKETCH4_H_2)
        with Locations(Location((15.4, 96.147667392, 0), (0, 0, 270))):
            Circle(SKETCH4_R, mode=Mode.SUBTRACT)
    extrude(amount=-BOSS_EXTRUDE1_DEPTH)


solid = part.part
